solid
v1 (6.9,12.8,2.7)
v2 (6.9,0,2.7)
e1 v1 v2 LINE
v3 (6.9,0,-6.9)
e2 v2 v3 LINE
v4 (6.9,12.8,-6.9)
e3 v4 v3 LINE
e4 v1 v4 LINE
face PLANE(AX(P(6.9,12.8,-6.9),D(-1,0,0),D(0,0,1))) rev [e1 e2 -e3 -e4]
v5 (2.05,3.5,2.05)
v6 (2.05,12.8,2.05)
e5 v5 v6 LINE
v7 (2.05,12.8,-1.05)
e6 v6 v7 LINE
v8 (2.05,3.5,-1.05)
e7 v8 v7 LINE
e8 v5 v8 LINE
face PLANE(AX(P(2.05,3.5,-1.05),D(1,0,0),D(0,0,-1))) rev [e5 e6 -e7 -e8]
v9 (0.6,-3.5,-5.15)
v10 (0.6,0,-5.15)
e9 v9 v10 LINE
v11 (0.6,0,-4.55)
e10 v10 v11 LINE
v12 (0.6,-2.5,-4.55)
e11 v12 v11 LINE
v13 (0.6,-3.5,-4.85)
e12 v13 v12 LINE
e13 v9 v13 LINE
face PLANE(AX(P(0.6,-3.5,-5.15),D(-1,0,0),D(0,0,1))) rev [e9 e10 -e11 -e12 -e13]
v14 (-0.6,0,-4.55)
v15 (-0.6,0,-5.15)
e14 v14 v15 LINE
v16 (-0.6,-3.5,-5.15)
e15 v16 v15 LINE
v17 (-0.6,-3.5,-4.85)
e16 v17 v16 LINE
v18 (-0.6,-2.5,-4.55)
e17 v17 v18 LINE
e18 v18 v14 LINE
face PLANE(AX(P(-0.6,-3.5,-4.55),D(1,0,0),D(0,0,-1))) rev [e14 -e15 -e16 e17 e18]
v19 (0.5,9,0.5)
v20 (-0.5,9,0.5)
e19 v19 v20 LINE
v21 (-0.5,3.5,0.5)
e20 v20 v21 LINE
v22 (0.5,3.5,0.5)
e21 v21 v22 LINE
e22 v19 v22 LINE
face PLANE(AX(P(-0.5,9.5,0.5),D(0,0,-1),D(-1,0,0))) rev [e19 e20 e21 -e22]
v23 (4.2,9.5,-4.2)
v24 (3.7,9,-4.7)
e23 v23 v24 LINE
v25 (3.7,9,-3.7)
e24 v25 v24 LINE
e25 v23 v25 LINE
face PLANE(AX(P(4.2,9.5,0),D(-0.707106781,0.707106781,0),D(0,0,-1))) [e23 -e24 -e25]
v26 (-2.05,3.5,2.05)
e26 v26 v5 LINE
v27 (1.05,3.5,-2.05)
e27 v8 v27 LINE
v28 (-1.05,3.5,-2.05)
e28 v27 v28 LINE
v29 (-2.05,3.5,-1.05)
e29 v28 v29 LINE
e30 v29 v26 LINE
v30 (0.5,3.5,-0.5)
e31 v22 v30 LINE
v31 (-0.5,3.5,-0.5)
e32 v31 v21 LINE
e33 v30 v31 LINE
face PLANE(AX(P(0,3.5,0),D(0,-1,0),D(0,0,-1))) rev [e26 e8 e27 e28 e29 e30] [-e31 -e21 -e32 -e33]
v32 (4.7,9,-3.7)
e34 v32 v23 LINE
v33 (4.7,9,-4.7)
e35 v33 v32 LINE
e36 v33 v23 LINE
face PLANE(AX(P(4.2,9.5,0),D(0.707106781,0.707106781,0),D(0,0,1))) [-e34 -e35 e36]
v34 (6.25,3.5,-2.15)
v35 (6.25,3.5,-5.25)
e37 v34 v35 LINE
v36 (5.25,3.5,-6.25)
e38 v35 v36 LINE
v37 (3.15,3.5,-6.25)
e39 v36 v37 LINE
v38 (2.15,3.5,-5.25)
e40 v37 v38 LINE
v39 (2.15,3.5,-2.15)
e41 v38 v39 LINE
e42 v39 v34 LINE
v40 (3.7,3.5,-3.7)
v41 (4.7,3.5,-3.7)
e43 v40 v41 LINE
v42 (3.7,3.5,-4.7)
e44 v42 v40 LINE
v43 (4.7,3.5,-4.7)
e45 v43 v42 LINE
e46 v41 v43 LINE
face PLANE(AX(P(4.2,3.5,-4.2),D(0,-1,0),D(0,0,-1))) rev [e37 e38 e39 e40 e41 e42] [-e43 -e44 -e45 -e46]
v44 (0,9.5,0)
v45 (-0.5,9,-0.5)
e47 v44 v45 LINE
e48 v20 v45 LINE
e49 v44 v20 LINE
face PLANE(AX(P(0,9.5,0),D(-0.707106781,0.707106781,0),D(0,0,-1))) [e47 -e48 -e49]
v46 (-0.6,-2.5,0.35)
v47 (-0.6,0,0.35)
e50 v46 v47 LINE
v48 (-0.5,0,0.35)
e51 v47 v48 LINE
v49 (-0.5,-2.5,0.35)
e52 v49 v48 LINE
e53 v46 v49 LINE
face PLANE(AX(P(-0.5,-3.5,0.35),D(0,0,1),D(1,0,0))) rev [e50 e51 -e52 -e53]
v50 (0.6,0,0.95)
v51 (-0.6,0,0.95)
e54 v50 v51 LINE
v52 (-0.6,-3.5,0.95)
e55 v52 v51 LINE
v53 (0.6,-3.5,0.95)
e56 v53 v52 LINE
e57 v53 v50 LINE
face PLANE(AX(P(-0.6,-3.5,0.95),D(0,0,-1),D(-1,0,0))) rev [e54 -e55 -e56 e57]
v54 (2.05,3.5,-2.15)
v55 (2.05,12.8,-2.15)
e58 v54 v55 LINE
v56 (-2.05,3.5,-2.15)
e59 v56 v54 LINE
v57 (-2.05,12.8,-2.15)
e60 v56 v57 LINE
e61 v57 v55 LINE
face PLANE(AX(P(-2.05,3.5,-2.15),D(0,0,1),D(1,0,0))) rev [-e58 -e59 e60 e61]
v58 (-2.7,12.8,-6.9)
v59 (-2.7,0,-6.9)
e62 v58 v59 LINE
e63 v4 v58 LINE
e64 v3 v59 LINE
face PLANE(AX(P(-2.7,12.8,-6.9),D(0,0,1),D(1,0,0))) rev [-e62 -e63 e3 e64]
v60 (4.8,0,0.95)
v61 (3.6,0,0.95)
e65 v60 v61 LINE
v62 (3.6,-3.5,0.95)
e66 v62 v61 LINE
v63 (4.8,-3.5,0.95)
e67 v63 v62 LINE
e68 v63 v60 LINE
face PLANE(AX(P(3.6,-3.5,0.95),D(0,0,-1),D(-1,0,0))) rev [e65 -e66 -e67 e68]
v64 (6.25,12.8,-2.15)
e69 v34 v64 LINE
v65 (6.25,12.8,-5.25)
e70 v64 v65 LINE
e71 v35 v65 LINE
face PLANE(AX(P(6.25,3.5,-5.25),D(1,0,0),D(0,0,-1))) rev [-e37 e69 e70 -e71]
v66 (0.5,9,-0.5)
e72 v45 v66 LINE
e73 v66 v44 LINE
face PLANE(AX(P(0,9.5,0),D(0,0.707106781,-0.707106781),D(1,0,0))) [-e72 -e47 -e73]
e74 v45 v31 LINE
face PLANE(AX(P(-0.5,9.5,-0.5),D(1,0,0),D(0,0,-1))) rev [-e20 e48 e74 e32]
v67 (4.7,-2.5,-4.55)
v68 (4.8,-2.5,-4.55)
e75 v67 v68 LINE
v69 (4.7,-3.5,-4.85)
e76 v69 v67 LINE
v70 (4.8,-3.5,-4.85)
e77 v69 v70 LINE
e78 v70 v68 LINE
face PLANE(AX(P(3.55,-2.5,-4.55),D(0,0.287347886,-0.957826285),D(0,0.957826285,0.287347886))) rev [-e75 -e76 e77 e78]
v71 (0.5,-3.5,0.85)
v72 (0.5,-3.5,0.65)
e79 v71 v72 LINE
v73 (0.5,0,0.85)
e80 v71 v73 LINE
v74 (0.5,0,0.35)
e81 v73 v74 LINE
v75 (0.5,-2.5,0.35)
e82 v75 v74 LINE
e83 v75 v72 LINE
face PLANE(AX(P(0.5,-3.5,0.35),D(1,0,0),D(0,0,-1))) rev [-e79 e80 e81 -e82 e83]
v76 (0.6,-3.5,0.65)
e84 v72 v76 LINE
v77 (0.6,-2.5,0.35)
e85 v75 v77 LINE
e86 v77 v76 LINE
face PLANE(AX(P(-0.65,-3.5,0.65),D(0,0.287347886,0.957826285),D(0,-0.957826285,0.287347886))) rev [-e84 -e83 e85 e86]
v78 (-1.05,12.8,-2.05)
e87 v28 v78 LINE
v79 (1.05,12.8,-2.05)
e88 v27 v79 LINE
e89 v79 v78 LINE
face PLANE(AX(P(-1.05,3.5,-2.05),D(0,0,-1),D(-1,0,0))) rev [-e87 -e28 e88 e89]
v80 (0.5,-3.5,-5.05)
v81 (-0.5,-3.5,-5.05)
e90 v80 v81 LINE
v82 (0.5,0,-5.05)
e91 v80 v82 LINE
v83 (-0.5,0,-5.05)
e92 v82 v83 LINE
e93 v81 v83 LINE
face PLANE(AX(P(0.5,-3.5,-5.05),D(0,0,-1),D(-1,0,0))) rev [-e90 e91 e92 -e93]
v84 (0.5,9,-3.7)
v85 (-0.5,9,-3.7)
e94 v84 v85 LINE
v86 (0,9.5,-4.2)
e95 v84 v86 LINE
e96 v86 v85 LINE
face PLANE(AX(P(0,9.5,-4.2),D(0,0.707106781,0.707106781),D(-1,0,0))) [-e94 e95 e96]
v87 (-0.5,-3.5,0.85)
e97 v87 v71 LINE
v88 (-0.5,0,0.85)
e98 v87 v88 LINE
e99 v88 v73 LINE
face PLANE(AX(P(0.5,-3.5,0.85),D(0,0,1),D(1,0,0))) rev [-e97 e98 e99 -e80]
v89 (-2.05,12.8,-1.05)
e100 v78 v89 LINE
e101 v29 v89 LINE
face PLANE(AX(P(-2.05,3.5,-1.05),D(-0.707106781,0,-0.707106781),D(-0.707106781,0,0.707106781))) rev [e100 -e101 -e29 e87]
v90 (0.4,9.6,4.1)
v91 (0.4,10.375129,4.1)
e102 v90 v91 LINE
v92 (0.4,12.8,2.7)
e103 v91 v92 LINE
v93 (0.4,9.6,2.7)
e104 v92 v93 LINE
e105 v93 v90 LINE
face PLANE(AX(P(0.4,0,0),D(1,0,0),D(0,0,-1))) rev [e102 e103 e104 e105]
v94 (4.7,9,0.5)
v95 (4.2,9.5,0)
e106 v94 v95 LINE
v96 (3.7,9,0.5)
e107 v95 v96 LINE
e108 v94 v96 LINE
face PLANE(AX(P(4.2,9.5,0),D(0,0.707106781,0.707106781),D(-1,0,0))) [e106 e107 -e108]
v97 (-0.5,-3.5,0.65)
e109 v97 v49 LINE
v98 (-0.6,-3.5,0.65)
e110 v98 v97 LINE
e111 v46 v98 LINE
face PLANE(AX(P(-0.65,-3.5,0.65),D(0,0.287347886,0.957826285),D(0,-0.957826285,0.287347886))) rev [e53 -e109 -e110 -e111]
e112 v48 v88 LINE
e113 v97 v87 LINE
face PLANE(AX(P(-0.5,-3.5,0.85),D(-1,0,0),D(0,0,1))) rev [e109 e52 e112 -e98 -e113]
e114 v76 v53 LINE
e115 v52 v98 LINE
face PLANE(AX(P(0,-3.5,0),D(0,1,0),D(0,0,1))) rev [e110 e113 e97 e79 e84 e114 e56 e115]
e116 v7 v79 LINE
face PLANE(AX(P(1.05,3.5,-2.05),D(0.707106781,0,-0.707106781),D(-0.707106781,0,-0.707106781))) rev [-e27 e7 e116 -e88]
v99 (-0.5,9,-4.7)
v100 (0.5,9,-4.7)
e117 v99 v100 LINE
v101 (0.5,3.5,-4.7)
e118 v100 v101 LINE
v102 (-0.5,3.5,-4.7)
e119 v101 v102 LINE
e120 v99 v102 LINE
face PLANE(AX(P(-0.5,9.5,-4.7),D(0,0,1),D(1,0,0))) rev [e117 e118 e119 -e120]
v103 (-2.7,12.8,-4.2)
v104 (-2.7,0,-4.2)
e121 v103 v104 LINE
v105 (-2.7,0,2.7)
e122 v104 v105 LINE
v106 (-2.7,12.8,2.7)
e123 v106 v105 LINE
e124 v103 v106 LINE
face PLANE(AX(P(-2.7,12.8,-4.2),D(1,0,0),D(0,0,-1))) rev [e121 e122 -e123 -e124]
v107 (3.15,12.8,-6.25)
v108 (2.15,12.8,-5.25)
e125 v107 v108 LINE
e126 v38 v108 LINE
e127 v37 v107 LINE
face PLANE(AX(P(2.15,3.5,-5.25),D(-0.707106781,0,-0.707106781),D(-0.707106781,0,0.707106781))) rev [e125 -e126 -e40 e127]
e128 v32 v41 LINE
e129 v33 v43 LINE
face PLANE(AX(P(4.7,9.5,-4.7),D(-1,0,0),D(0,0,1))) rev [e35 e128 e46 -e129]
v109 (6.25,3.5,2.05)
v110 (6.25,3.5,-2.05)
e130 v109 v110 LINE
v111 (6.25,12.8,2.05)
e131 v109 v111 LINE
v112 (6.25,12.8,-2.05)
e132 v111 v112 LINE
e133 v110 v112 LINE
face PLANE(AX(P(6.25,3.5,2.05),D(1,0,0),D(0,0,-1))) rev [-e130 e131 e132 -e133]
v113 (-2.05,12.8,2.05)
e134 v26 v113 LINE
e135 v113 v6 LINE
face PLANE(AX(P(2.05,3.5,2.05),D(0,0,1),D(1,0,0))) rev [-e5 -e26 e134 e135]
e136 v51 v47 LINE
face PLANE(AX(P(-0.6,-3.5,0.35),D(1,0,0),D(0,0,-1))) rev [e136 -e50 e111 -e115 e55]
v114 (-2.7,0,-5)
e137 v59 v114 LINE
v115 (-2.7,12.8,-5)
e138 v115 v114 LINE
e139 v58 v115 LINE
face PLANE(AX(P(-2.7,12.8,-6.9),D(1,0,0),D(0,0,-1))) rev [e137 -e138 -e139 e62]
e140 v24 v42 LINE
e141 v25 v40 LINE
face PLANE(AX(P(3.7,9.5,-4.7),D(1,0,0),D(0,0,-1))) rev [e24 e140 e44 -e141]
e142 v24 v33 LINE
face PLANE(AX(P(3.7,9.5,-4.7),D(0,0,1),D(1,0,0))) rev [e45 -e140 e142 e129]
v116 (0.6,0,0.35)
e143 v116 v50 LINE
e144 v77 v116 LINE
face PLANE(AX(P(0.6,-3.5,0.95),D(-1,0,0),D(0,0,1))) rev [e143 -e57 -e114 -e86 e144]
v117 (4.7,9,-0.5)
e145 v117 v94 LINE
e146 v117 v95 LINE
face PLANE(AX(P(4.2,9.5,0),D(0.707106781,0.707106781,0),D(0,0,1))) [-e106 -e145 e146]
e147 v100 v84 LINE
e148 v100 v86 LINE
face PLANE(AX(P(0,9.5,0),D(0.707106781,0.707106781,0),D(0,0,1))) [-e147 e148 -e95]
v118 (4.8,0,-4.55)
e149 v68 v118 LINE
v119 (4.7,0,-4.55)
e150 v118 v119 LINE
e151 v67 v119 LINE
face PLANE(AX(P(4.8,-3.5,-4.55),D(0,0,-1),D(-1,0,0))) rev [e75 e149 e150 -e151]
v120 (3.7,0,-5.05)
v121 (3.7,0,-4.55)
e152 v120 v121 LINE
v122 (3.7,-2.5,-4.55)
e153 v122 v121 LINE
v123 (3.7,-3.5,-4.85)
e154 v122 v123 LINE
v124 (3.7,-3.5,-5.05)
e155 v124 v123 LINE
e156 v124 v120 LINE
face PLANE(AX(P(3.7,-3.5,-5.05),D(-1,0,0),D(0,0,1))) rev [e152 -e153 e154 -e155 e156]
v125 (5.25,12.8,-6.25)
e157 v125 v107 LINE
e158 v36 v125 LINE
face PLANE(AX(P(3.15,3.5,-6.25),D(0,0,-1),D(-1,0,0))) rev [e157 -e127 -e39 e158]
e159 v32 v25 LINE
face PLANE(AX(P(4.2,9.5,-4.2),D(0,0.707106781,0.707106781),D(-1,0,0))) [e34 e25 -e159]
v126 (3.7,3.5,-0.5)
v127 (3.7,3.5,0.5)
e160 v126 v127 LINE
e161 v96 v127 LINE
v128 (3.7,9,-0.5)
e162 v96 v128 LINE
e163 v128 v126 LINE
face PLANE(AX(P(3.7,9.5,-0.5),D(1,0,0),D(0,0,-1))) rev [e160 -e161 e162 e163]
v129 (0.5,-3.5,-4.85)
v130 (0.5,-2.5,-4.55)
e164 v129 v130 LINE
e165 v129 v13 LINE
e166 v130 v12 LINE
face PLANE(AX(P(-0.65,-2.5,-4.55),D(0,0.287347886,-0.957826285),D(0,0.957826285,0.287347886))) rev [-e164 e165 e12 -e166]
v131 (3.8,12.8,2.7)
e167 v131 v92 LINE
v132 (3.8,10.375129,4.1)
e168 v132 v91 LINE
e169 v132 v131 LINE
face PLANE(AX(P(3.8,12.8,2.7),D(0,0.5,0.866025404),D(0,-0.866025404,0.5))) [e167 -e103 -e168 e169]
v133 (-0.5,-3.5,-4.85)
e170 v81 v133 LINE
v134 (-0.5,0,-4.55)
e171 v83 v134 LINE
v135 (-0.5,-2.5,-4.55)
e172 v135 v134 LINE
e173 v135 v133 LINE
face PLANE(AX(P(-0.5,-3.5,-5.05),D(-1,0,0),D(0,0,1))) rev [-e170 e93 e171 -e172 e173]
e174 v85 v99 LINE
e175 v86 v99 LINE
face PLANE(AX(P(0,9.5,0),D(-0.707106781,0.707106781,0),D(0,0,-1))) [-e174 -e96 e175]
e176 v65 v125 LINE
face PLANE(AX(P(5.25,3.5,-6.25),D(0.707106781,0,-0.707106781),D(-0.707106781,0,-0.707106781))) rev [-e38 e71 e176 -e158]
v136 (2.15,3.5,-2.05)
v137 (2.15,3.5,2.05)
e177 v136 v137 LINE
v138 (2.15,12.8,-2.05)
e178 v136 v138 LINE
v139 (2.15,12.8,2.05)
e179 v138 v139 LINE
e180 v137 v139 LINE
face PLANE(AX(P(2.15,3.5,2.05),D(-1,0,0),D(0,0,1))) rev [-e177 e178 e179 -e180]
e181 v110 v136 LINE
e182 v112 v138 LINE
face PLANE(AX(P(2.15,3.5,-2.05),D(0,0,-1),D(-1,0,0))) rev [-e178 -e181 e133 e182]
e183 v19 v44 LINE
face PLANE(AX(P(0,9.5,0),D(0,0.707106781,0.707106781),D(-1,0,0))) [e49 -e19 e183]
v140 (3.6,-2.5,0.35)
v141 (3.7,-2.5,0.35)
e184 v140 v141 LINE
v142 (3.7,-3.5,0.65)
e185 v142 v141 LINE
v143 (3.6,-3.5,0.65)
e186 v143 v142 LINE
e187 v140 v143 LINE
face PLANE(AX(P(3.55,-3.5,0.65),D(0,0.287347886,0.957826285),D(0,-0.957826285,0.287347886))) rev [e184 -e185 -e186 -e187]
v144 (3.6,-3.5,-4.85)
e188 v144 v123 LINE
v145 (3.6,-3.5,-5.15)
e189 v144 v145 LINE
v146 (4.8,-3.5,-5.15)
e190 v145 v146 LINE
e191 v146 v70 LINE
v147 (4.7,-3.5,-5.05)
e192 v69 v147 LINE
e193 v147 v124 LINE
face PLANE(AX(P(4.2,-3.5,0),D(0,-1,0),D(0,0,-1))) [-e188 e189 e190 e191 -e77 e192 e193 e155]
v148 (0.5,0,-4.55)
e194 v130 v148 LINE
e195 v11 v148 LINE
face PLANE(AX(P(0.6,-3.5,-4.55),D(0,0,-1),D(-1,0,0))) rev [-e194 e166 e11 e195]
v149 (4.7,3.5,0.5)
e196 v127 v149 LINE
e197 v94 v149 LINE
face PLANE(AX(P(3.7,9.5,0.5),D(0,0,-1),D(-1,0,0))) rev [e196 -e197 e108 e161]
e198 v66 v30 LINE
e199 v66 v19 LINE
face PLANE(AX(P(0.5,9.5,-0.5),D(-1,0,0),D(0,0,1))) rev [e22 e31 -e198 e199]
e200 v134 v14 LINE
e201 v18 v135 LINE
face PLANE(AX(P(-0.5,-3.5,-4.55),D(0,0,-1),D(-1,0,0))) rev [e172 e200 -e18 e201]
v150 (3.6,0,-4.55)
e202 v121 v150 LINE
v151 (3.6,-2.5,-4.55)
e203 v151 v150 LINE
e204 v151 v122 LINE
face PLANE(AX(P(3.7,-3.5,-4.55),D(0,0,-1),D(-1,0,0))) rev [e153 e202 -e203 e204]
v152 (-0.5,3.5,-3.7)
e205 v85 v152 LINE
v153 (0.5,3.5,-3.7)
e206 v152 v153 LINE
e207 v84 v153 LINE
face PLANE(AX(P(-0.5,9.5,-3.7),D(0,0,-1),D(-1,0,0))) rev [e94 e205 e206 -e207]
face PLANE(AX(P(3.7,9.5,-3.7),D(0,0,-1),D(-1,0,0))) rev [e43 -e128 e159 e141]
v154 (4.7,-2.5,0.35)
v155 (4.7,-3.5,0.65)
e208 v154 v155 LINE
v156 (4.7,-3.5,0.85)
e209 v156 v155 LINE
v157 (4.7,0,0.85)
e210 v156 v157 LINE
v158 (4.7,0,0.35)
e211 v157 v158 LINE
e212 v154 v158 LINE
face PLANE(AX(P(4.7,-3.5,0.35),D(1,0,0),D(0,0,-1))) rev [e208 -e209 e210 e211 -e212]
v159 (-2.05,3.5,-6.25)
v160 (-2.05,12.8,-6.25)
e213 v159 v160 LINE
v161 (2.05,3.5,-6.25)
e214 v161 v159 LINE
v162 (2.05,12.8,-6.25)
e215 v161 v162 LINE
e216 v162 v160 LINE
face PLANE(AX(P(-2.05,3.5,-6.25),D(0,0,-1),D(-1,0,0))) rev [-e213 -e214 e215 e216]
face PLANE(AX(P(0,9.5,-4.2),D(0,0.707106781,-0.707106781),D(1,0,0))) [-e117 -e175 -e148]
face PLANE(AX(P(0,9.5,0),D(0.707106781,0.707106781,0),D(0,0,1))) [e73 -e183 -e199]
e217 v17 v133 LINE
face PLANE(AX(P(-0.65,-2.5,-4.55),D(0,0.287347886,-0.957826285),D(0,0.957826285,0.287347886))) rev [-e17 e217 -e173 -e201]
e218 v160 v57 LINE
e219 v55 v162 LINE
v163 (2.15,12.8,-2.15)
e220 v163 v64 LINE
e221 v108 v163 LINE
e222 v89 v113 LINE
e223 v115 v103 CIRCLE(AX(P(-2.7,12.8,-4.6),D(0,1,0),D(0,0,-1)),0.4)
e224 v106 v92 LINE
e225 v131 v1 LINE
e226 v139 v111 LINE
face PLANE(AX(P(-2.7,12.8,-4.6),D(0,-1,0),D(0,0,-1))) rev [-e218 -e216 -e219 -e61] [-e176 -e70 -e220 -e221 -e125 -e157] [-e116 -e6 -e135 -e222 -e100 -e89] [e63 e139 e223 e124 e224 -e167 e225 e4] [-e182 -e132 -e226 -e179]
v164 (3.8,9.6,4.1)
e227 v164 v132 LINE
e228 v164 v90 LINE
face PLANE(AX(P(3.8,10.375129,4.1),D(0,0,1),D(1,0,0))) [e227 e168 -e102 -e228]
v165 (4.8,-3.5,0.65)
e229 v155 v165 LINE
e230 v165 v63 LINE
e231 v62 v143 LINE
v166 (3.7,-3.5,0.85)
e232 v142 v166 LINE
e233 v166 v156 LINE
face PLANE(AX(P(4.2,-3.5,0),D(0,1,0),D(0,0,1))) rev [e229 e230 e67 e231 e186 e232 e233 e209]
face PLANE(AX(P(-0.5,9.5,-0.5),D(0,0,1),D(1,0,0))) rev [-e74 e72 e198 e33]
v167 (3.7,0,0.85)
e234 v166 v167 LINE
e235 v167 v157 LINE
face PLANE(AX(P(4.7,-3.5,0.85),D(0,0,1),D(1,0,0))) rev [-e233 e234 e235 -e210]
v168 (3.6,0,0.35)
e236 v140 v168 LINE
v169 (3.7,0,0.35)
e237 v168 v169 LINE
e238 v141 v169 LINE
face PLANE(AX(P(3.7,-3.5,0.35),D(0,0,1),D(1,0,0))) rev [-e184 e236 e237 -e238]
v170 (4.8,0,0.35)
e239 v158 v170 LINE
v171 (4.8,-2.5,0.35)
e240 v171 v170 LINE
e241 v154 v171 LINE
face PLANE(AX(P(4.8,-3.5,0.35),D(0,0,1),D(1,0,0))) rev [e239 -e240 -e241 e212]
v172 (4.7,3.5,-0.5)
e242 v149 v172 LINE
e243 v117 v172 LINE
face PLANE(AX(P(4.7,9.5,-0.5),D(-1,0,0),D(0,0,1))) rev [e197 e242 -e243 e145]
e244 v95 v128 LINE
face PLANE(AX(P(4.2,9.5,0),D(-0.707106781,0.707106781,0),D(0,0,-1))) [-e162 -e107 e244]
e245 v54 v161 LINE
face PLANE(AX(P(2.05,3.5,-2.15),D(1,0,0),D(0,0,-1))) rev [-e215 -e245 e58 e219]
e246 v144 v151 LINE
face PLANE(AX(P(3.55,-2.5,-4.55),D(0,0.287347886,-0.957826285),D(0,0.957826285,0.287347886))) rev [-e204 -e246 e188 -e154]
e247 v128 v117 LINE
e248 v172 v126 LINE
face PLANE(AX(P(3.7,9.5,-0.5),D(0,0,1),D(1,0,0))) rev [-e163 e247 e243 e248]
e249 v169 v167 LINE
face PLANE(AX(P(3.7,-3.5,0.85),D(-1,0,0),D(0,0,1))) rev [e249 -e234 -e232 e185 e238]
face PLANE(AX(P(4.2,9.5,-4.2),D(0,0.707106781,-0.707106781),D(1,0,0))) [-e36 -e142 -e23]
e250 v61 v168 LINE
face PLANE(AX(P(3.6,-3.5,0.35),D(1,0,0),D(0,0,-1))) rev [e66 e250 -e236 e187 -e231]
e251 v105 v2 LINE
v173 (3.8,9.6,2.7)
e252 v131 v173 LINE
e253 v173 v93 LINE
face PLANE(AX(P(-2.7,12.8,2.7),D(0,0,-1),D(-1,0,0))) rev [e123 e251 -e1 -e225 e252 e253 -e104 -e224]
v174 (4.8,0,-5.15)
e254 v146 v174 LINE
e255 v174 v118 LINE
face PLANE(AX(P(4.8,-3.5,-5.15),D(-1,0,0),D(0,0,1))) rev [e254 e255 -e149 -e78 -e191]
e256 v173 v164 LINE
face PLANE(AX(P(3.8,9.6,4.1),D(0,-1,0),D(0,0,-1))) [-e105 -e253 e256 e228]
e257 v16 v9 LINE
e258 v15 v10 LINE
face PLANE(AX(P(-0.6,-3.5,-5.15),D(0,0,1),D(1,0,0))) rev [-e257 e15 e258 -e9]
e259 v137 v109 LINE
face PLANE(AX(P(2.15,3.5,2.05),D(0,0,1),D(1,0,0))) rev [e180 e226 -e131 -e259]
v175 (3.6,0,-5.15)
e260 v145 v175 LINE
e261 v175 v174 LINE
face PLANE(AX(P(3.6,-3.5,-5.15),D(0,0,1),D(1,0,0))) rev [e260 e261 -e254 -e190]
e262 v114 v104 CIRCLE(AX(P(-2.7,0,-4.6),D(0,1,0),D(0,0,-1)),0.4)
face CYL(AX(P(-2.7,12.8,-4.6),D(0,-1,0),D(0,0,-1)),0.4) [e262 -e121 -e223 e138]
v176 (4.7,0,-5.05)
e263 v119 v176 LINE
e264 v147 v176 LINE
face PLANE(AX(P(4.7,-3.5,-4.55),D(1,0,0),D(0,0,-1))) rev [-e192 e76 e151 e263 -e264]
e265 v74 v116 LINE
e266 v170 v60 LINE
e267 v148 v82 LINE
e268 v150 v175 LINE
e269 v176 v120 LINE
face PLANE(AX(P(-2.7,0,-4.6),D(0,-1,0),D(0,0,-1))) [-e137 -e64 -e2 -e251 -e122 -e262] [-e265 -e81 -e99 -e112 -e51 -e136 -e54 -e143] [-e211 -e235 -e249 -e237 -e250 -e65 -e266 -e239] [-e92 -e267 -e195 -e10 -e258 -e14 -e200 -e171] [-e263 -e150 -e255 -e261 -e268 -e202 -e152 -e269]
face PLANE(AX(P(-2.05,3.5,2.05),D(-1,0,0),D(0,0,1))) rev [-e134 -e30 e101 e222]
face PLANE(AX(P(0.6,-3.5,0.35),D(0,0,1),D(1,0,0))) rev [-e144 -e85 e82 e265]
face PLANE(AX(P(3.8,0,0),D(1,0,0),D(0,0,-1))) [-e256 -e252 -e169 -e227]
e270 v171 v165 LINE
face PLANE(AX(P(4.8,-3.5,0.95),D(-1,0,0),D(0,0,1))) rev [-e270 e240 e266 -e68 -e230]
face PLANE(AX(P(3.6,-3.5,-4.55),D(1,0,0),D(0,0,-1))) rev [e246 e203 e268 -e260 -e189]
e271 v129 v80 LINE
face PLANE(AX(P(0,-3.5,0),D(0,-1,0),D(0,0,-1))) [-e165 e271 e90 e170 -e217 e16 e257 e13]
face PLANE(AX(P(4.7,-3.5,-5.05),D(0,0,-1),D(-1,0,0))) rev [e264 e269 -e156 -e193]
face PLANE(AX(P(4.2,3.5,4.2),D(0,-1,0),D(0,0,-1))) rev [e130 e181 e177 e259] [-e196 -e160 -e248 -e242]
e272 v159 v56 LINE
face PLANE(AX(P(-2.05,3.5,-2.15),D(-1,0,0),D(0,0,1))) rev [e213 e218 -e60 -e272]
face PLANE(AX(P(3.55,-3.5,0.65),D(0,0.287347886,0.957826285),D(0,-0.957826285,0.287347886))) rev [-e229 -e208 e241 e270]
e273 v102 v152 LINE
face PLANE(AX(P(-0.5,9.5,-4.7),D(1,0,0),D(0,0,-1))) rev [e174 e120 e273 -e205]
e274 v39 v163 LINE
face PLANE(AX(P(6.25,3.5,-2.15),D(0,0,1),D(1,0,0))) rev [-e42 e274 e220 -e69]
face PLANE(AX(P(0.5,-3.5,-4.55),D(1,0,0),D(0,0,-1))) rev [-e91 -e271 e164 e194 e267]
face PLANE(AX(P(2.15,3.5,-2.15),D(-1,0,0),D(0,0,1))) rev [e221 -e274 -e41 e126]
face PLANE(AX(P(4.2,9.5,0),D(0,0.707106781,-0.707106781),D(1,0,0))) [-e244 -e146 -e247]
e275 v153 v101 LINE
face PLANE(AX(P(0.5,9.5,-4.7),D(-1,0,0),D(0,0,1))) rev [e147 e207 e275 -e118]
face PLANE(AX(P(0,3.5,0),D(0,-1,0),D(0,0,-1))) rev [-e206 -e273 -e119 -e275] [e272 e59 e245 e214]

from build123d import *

# Parameters (mm, degrees)
HOUSING_DEPTH                      = 12.8
CUT_EXTRUDE_3_DEPTH                = 9.3
SKETCH_3_W                         = 4.1
SKETCH_3_H                         = 4.1
CUT_EXTRUDE_4_DEPTH                = 9.3
PATTERN_LINEAR_1_COUNT             = 2
PATTERN_LINEAR_1_PITCH             = 4.2
PATTERN_LINEAR_1_COUNT_DIR2        = 2
PATTERN_LINEAR_1_PITCH_DIR2        = 4.2
PATTERN_LINEAR_2_COUNT             = 2
PATTERN_LINEAR_2_PITCH             = 4.2
PATTERN_LINEAR_2_COUNT_DIR2        = 2
PATTERN_LINEAR_2_PITCH_DIR2        = 4.2
SKETCH_4_W                         = 1
SKETCH_4_H                         = 1
EXTRUDE_2286_DEPTH                 = 6
CHAMFER_1_SIZE                     = 0.5
PATTERN_LINEAR_3_COUNT             = 2
PATTERN_LINEAR_3_PITCH             = 4.2
CHAMFER_1_OF_PATTERN_LINEAR_3_SIZE = 0.5
EXTRUDE_START                      = -3.1
EXTRUDE_3473_DEPTH                 = 3.4
EXTRUDE_3845_DEPTH                 = 3.5
CUT_EXTRUDE_5_DEPTH                = 1.25
PATTERN_LINEAR_4_COUNT             = 2
PATTERN_LINEAR_4_PITCH             = 4.2


with BuildPart() as part:
    # Эскиз1 → Housing (new body)
    with BuildSketch(Plane(origin=(0, 0, 0), x_dir=(1, 0, 0), z_dir=(0, 1, 0))):
        with BuildLine():
            Line((-2.7, 4.2), (-2.7, -2.7))
            Line((-2.7, -2.7), (6.9, -2.7))
            Line((6.9, -2.7), (6.9, 6.9))
            Line((6.9, 6.9), (-2.7, 6.9))
            Line((-2.7, 6.9), (-2.7, 5))
            ThreePointArc((-2.7, 5), (-3.1, 4.6), (-2.7, 4.2))
        make_face()
    extrude(amount=HOUSING_DEPTH)

    # Эскиз2 → Вырез-Вытянуть3 (cut)
    with BuildSketch(Plane(origin=(0, 12.8, 0), x_dir=(1, 0, 0), z_dir=(0, 1, 0))):
        Polygon((-2.05, -2.05), (-2.05, 1.05), (-1.05, 2.05), (1.05, 2.05), (2.05, 1.05), (2.05, -2.05), align=None)
    cut_extrude_3 = extrude(amount=-CUT_EXTRUDE_3_DEPTH, mode=Mode.SUBTRACT)

    # Эскиз3 → Вырез-Вытянуть4 (cut)
    with BuildSketch(Plane(origin=(0, 12.8, 0), x_dir=(1, 0, 0), z_dir=(0, 1, 0))):
        with Locations((0, 4.2)):
            Rectangle(SKETCH_3_W, SKETCH_3_H)
    cut_extrude_4 = extrude(amount=-CUT_EXTRUDE_4_DEPTH, mode=Mode.SUBTRACT)

    # Линейный массив1: Cut-Extrude 4 2 × 2, 2 skipped
    with Locations(*[(i * PATTERN_LINEAR_1_PITCH, 0, j * PATTERN_LINEAR_1_PITCH_DIR2) for i in range(PATTERN_LINEAR_1_COUNT) for j in range(PATTERN_LINEAR_1_COUNT_DIR2) if (i, j) not in ((0, 0), (0, 1), (1, 0))]):
        add(cut_extrude_4, mode=Mode.SUBTRACT)

    # Линейный массив2: Cut-Extrude 3 2 × 2, 2 skipped
    with Locations(*[(i * PATTERN_LINEAR_2_PITCH, 0, -j * PATTERN_LINEAR_2_PITCH_DIR2) for i in range(PATTERN_LINEAR_2_COUNT) for j in range(PATTERN_LINEAR_2_COUNT_DIR2) if (i, j) not in ((0, 0), (0, 1), (1, 0))]):
        add(cut_extrude_3, mode=Mode.SUBTRACT)

    # Эскиз4 → Extrude 2286 (add)
    with BuildSketch(Plane(origin=(0, 3.5, 0), x_dir=(1, 0, 0), z_dir=(0, 1, 0))):
        Rectangle(SKETCH_4_W, SKETCH_4_H)
        with Locations((0, 4.2)):
            Rectangle(SKETCH_4_W, SKETCH_4_H)
    extrude_2286 = extrude(amount=EXTRUDE_2286_DEPTH)

    # Фаска1
    chamfer_1_edges = [part.edges().sort_by_distance(p)[0] for p in [
        (0.5, 9.5, 0),
        (0, 9.5, -0.5),
        (-0.5, 9.5, 0),
        (0, 9.5, 0.5),
        (0.5, 9.5, -4.2),
        (0, 9.5, -4.7),
        (-0.5, 9.5, -4.2),
        (0, 9.5, -3.7),
    ]]
    chamfer(chamfer_1_edges, length=CHAMFER_1_SIZE - 0.0001)  # a hair under: the kernel refuses the full size

    # Линейный массив3: Extrude 2286 ×2
    with Locations(*[(i * PATTERN_LINEAR_3_PITCH, 0, 0) for i in range(1, PATTERN_LINEAR_3_COUNT)]):
        add(extrude_2286)

    # Фаска1 of Линейный массив3
    chamfer_1_of_pattern_linear_3_edges = [part.edges().sort_by_distance(p)[0] for p in [
        (4.7, 9.5, 0),
        (4.2, 9.5, -0.5),
        (3.7, 9.5, 0),
        (4.2, 9.5, 0.5),
        (4.7, 9.5, -4.2),
        (4.2, 9.5, -4.7),
        (3.7, 9.5, -4.2),
        (4.2, 9.5, -3.7),
    ]]
    chamfer(chamfer_1_of_pattern_linear_3_edges, length=CHAMFER_1_OF_PATTERN_LINEAR_3_SIZE - 0.0001)  # a hair under: the kernel refuses the full size

    # Эскиз5 → Extrude 3473 (add)
    with BuildSketch(Plane.ZY.offset(2.7).offset(EXTRUDE_START)):
        Polygon((2.7, 9.6), (2.7, 12.8), (4.1, 10.375128869), (4.1, 9.6), align=None)
    extrude(amount=-EXTRUDE_3473_DEPTH)

    # Эскиз6 → Extrude 3845 (add)
    with BuildSketch(Plane.XZ):
        Polygon((-0.6, -4.55), (-0.6, -5.15), (0.6, -5.15), (0.6, -4.55), (0.5, -4.55), (0.5, -5.05), (-0.5, -5.05), (-0.5, -4.55), align=None)
        Polygon((-0.5, 0.35), (-0.6, 0.35), (-0.6, 0.95), (0.6, 0.95), (0.6, 0.35), (0.5, 0.35), (0.5, 0.85), (-0.5, 0.85), align=None)
    extrude_3845 = extrude(amount=EXTRUDE_3845_DEPTH)

    # Эскиз7 → Вырез-Вытянуть5 (cut)
    with BuildSketch(Plane(origin=(0.6, 0, 0), x_dir=(0, 0, -1), z_dir=(1, 0, 0))):
        Polygon((-0.65, -3.5), (-0.35, -2.5), (4.55, -2.5), (4.85, -3.5), align=None)
    cut_extrude_5 = extrude(amount=-CUT_EXTRUDE_5_DEPTH, mode=Mode.SUBTRACT)

    # Линейный массив4: Extrude 3845, Вырез-Вытянуть5 ×2
    with Locations(*[(i * PATTERN_LINEAR_4_PITCH, 0, 0) for i in range(1, PATTERN_LINEAR_4_COUNT)]):
        add(extrude_3845)
        add(cut_extrude_5, mode=Mode.SUBTRACT)


solid = part.part
